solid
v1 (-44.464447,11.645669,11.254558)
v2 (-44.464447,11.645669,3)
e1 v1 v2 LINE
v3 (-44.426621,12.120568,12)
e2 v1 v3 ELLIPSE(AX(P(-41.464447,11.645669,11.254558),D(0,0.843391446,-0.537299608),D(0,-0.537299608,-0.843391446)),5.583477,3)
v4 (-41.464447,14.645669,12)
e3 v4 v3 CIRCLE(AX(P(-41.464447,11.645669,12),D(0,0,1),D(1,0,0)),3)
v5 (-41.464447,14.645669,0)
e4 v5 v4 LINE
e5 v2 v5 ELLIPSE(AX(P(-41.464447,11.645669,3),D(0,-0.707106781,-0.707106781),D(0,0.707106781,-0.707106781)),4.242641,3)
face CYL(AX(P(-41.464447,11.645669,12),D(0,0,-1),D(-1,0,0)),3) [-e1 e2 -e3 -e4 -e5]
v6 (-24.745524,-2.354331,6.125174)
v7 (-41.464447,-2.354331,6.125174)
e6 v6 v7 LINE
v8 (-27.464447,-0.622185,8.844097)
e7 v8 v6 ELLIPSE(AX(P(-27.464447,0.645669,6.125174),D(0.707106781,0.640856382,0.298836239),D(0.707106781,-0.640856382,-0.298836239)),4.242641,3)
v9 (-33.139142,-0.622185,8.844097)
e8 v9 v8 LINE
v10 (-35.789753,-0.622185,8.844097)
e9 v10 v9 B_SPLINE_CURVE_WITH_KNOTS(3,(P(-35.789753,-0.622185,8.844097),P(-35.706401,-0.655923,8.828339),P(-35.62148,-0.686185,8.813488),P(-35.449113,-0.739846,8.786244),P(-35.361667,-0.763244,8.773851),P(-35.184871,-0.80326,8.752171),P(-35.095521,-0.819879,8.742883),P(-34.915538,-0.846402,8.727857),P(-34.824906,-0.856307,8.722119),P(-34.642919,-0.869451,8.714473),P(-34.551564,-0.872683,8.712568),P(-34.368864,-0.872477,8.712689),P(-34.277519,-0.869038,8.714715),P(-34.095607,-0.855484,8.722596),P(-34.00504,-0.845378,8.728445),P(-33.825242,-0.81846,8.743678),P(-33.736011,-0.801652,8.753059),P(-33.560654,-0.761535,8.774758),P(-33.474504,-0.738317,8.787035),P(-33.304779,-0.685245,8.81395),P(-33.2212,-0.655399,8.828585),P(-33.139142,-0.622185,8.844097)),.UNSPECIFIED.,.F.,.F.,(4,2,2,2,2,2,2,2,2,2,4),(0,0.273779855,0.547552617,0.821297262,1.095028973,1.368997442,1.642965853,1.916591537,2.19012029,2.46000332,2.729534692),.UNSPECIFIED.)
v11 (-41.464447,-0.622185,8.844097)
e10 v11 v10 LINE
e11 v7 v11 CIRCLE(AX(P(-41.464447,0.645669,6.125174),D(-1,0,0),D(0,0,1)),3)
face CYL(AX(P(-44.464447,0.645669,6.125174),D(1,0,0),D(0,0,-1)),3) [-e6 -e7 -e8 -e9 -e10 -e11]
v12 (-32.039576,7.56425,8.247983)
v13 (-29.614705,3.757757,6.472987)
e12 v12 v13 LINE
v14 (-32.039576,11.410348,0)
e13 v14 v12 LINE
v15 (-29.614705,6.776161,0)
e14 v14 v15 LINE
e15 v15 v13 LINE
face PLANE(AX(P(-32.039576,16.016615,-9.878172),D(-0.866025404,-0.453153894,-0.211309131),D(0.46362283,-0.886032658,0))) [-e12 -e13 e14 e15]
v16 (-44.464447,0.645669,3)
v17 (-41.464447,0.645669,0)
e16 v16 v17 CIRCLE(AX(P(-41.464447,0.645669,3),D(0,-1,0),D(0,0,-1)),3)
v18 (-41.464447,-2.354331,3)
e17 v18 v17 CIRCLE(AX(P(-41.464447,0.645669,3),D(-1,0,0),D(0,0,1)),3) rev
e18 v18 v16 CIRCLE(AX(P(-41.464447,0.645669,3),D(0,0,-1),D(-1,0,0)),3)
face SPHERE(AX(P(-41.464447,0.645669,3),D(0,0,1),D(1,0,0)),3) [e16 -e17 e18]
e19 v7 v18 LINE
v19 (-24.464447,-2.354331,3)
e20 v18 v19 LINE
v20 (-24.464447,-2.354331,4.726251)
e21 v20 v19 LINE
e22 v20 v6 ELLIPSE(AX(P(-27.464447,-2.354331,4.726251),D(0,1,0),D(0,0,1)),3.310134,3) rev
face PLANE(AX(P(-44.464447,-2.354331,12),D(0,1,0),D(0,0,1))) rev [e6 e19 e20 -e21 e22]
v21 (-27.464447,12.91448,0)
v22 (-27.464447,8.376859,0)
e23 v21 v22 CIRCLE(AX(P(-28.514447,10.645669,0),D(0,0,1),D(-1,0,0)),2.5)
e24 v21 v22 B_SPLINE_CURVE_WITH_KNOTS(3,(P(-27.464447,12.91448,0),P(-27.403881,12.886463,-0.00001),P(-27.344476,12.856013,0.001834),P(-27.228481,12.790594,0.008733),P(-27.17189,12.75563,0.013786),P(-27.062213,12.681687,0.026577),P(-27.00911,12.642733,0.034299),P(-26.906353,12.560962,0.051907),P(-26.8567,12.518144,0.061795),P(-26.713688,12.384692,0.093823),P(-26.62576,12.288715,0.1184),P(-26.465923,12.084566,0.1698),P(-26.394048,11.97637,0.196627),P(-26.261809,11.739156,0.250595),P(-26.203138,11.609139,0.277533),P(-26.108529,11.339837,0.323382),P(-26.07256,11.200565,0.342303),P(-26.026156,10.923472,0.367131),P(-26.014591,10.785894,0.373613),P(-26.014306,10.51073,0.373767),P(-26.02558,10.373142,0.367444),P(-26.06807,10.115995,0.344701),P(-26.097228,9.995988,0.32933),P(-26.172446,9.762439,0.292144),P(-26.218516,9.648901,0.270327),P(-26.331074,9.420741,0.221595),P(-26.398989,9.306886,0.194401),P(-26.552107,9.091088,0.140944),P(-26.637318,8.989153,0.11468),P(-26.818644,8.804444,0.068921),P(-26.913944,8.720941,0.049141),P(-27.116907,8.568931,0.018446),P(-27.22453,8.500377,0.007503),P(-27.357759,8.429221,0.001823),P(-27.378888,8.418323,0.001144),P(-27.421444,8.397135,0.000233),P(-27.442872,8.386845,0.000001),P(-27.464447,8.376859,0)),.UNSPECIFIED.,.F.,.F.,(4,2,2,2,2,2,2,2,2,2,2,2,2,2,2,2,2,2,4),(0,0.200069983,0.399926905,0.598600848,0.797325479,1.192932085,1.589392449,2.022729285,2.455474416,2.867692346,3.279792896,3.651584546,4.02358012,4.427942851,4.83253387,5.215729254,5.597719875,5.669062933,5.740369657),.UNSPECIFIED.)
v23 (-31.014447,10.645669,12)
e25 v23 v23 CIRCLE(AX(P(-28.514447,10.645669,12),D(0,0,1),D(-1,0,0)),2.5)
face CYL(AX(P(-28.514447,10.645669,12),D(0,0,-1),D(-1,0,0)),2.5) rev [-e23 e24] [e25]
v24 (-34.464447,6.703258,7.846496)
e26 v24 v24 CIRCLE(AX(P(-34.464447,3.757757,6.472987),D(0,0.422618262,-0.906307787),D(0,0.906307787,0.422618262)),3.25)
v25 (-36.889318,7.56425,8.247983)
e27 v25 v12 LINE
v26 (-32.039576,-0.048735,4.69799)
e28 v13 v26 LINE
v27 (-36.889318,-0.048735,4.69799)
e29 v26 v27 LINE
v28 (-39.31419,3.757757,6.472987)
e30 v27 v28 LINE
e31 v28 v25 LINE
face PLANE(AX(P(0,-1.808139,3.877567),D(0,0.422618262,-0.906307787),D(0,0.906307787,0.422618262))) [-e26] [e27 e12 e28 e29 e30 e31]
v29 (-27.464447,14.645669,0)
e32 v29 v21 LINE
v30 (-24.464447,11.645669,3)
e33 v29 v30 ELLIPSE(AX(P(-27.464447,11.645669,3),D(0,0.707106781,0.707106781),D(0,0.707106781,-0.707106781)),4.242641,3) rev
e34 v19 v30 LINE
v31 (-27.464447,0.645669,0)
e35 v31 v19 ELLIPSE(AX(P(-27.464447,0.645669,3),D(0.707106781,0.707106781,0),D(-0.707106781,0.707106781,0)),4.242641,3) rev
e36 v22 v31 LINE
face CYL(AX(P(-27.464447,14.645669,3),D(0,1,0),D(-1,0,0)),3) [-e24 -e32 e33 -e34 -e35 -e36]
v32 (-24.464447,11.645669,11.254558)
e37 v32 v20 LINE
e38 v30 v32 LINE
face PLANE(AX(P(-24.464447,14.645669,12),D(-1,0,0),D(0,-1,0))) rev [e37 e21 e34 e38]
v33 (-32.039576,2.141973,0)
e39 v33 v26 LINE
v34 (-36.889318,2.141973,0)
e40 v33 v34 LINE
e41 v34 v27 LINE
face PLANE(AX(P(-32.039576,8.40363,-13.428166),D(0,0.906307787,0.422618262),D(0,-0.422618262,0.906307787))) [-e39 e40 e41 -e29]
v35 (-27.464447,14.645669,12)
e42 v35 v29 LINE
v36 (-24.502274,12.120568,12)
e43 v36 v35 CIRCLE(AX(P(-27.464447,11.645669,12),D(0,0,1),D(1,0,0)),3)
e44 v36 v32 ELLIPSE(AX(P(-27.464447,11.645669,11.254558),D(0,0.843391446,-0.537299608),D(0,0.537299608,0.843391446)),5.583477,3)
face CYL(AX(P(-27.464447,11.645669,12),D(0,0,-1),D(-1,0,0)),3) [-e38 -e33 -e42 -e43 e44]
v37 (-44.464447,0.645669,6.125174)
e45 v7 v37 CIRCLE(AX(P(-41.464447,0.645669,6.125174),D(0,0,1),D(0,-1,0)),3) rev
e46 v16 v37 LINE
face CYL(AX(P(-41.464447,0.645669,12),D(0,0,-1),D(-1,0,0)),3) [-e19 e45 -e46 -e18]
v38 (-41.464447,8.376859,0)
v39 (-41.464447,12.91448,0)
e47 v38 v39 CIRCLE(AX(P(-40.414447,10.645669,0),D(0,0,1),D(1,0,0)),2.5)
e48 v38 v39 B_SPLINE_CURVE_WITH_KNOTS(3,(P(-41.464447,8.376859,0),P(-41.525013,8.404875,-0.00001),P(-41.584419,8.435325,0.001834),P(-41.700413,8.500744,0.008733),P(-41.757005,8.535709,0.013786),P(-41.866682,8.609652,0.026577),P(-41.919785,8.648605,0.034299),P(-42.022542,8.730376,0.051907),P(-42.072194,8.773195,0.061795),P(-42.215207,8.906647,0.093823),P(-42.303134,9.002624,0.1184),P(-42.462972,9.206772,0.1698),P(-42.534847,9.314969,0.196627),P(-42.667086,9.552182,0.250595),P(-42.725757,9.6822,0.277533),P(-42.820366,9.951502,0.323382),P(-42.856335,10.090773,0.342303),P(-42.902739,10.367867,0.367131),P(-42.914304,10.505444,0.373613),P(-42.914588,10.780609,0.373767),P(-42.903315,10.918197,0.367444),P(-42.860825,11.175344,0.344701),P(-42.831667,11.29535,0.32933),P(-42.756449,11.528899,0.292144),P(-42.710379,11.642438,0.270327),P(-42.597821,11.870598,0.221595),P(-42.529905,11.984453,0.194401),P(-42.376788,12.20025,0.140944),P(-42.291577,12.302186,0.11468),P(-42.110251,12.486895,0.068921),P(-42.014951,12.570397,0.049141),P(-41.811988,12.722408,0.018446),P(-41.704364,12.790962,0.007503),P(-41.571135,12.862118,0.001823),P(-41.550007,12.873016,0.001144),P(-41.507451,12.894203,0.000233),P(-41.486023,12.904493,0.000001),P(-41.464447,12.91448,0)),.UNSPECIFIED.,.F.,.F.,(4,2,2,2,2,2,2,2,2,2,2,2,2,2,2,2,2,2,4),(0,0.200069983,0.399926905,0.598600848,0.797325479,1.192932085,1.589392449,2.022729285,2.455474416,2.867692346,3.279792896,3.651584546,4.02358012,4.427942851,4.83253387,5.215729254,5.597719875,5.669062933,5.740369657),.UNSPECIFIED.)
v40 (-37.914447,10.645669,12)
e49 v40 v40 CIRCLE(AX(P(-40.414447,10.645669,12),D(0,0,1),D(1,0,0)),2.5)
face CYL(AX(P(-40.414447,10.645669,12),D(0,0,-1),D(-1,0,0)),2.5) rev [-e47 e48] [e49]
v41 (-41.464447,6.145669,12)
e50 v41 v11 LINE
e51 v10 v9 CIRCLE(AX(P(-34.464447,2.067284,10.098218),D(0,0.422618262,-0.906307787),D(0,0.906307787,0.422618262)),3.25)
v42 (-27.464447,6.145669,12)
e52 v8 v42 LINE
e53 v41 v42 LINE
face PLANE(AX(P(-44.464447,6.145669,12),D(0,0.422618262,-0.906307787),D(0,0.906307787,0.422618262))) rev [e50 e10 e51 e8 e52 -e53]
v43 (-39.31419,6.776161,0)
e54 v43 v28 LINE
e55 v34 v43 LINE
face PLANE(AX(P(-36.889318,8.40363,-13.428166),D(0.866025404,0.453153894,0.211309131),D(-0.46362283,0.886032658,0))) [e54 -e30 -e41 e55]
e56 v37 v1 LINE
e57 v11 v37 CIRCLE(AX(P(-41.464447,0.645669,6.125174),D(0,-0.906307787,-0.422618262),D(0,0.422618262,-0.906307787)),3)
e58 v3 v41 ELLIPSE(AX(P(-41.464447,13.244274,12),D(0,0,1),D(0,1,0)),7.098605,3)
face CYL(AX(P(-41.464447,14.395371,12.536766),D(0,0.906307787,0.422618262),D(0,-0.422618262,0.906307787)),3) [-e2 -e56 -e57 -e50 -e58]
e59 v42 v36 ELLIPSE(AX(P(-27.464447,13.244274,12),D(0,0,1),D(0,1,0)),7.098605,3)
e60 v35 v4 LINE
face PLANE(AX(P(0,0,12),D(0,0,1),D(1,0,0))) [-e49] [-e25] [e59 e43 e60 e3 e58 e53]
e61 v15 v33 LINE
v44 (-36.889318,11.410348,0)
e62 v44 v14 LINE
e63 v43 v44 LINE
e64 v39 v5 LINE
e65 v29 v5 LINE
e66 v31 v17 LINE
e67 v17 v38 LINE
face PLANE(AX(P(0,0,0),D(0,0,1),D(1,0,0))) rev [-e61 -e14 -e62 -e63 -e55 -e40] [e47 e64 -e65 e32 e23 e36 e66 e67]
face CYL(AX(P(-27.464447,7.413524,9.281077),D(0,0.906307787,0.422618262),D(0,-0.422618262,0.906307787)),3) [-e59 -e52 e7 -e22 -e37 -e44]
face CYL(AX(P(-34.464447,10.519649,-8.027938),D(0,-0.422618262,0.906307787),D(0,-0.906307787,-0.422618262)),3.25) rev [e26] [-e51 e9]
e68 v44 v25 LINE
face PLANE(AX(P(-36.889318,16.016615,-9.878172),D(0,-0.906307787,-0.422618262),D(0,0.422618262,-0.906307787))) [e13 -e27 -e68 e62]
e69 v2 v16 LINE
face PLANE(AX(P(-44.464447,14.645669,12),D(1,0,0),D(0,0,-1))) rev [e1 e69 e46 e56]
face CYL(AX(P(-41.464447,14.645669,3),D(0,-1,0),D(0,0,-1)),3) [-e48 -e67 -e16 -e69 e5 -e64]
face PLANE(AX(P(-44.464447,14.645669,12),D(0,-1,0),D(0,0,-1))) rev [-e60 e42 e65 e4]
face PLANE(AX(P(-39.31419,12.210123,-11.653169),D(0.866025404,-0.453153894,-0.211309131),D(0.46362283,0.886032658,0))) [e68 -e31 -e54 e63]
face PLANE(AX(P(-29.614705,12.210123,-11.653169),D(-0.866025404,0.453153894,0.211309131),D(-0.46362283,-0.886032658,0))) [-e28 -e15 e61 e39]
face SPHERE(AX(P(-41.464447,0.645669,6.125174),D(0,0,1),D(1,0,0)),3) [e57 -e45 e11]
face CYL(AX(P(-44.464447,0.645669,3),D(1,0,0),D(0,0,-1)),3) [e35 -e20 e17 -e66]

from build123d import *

# Parameters (mm, degrees)
CROQUIS1_W              = 20
CROQUIS1_H              = 17
CROQUIS1_R              = 2.5
SALIENTE_EXTRUIR2_DEPTH = 12
CORTAR_EXTRUIR2_DEPTH   = 20
CROQUIS5_R              = 3.25
CORTAR_EXTRUIR3_DEPTH   = 20
CORTAR_EXTRUIR4_START   = 4
CORTAR_EXTRUIR4_DEPTH   = 20
REDONDEO1_R             = 3


with BuildPart() as part:
    # Croquis1 → Saliente-Extruir2 (new body)
    with BuildSketch(Plane.XY):
        with Locations((-34.464447367, 6.145669291)):
            Rectangle(CROQUIS1_W, CROQUIS1_H)
        with Locations((-40.414447367, 10.645669291)):
            Circle(CROQUIS1_R, mode=Mode.SUBTRACT)
        with Locations(Location((-28.514447367, 10.645669291, 0), (0, 0, 180))):
            Circle(CROQUIS1_R, mode=Mode.SUBTRACT)
    extrude(amount=SALIENTE_EXTRUIR2_DEPTH)

    # Croquis4 → Cortar-Extruir2 (cut)
    with BuildSketch(Plane(origin=(-24.464447367, 0, 0), x_dir=(0, 0, -1), z_dir=(1, 0, 0))):
        Polygon((-12, 6.145669291), (-8.036384906, -2.354330709), (-12, -2.354330709), align=None)
    extrude(amount=-CORTAR_EXTRUIR2_DEPTH, mode=Mode.SUBTRACT)

    # Croquis5 → Cortar-Extruir3 (cut)
    with BuildSketch(Plane(origin=(0, 11.801993797, 14.637587434), x_dir=(1, 0, 0), z_dir=(0, 0.42261826174069395, -0.9063077870366525))):
        with Locations(Location((-34.464447367, 10.741063562, 0), (0, 0, 90))):
            Circle(CROQUIS5_R)
    extrude(amount=CORTAR_EXTRUIR3_DEPTH, mode=Mode.SUBTRACT)

    # Croquis6 → Cortar-Extruir4 (cut)
    with BuildSketch(Plane(origin=(0, 11.801993797, 14.637587434), x_dir=(1, 0, 0), z_dir=(0, 0.42261826174069395, -0.9063077870366525)).offset(CORTAR_EXTRUIR4_START)):
        Polygon((-29.614705106, 10.741063562), (-32.039576236, 14.941063562), (-36.889318498, 14.941063562), (-39.314189628, 10.741063562), (-36.889318498, 6.541063562), (-32.039576236, 6.541063562), align=None)
    extrude(amount=CORTAR_EXTRUIR4_DEPTH, mode=Mode.SUBTRACT)

    # Redondeo1
    # the kernel refuses this fillet: 3 mm, written as the material it takes off along each edge
    with BuildSketch(Plane(origin=(-41.464447367, 0.645669291, 3), x_dir=(0, 0, -1), z_dir=(-1, 0, 0))) as redondeo1_piece_1_section:
        Polygon((0, 0), (REDONDEO1_R, 0), (REDONDEO1_R, REDONDEO1_R), (0, REDONDEO1_R), align=None)
    redondeo1_piece_1 = extrude(amount=REDONDEO1_R, mode=Mode.PRIVATE)
    redondeo1_piece_1 = redondeo1_piece_1 - Plane(origin=(-41.464447367, 0.645669291, 3), x_dir=(0, 0.7071067811865475, 0.7071067811865475), z_dir=(-1, 0, 0)) * Sphere(REDONDEO1_R, mode=Mode.PRIVATE)
    add(redondeo1_piece_1, mode=Mode.SUBTRACT)
    with BuildSketch(Plane(origin=(-41.464447367, 0.645669291, 6.125174123), x_dir=(0, -0.422618261740694, 0.9063077870366527), z_dir=(-1, 0, 0))) as redondeo1_piece_2_section:
        Polygon((0, 0), (REDONDEO1_R, 0), (REDONDEO1_R, -REDONDEO1_R * 0.637070260807), (REDONDEO1_R * 0.422618261741, -REDONDEO1_R * 0.906307787037), align=None)
    redondeo1_piece_2 = extrude(amount=REDONDEO1_R, mode=Mode.PRIVATE)
    redondeo1_piece_2 = redondeo1_piece_2 - Plane(origin=(-41.464447367, 0.645669291, 6.125174123), x_dir=(0, 0.8433914458128839, -0.5372996083468264), z_dir=(-1, 0, 0)) * Sphere(REDONDEO1_R, mode=Mode.PRIVATE)
    add(redondeo1_piece_2, mode=Mode.SUBTRACT)
    with BuildSketch(Plane(origin=(-44.464447367, 0.645669291, 0), x_dir=(0, 0, 1), z_dir=(0, 1, 0))) as redondeo1_piece_3:
        with BuildLine():
            CenterArc((REDONDEO1_R, REDONDEO1_R), REDONDEO1_R, 180, 90)
            Line((0, REDONDEO1_R), (0, 0))
            Line((0, 0), (REDONDEO1_R, 0))
        make_face()
    extrude(amount=21.5, mode=Mode.SUBTRACT)
    with BuildSketch(Plane(origin=(-44.464447367, 14.645669291, -7.5), x_dir=(1, 0, 0), z_dir=(0, 0, 1))) as redondeo1_piece_4:
        with BuildLine():
            CenterArc((REDONDEO1_R, -REDONDEO1_R), REDONDEO1_R, 90, 90)
            Line((0, -REDONDEO1_R), (0, 0))
            Line((0, 0), (REDONDEO1_R, 0))
        make_face()
    extrude(amount=27, mode=Mode.SUBTRACT)
    with BuildSketch(Plane(origin=(-24.464447367, 14.645669291, -7.5), x_dir=(-1, 0, 0), z_dir=(0, 0, 1))) as redondeo1_piece_5:
        with BuildLine():
            CenterArc((REDONDEO1_R, REDONDEO1_R), REDONDEO1_R, 180, 90)
            Line((0, REDONDEO1_R), (0, 0))
            Line((0, 0), (REDONDEO1_R, 0))
        make_face()
    extrude(amount=27, mode=Mode.SUBTRACT)
    with BuildSketch(Plane(origin=(-24.464447367, 22.145669291, 0), x_dir=(0, 0, 1), z_dir=(0, -1, 0))) as redondeo1_piece_6:
        with BuildLine():
            CenterArc((REDONDEO1_R, REDONDEO1_R), REDONDEO1_R, 180, 90)
            Line((0, REDONDEO1_R), (0, 0))
            Line((0, 0), (REDONDEO1_R, 0))
        make_face()
    extrude(amount=32, mode=Mode.SUBTRACT)
    with BuildSketch(Plane(origin=(-16.964447367, -2.354330709, 0), x_dir=(0, 1, 0), z_dir=(-1, 0, 0))) as redondeo1_piece_7:
        with BuildLine():
            CenterArc((REDONDEO1_R, -REDONDEO1_R), REDONDEO1_R, 90, 90)
            Line((0, -REDONDEO1_R), (0, 0))
            Line((0, 0), (REDONDEO1_R, 0))
        make_face()
    extrude(amount=24.5, mode=Mode.SUBTRACT)
    with BuildSketch(Plane(origin=(-44.464447367, -2.354330709, 3), x_dir=(0, 1, 0), z_dir=(0, 0, 1))) as redondeo1_piece_8:
        with BuildLine():
            CenterArc((REDONDEO1_R, -REDONDEO1_R), REDONDEO1_R, 90, 90)
            Line((0, -REDONDEO1_R), (0, 0))
            Line((0, 0), (REDONDEO1_R, 0))
        make_face()
    extrude(amount=3.125174123, mode=Mode.SUBTRACT)
    with BuildSketch(Plane(origin=(-44.464447367, 12.942977694, 15.169636963), x_dir=(0, 0.42261826174069395, -0.9063077870366526), z_dir=(0, -0.9063077870366526, -0.42261826174069395))) as redondeo1_piece_9:
        with BuildLine():
            CenterArc((REDONDEO1_R, REDONDEO1_R), REDONDEO1_R, 180, 90)
            Line((0, REDONDEO1_R), (0, 0))
            Line((0, 0), (REDONDEO1_R, 0))
        make_face()
    extrude(amount=14.967501529, mode=Mode.SUBTRACT)
    with BuildSketch(Plane(origin=(-24.464447367, 12.942977694, 15.169636963), x_dir=(0, 0.4226182617406939, -0.9063077870366525), z_dir=(0, -0.9063077870366526, -0.42261826174069395))) as redondeo1_piece_10:
        with BuildLine():
            CenterArc((REDONDEO1_R, -REDONDEO1_R), REDONDEO1_R, 90, 90)
            Line((0, -REDONDEO1_R), (0, 0))
            Line((0, 0), (REDONDEO1_R, 0))
        make_face()
    extrude(amount=24.378712311, mode=Mode.SUBTRACT)
    with BuildSketch(Plane(origin=(-19.686420411, -2.354330709, 8.036384906), x_dir=(0, 0.9063077870366527, 0.4226182617406936), z_dir=(-1, 0, 0))) as redondeo1_piece_11:
        with BuildLine():
            CenterArc((REDONDEO1_R * 0.637070260807, REDONDEO1_R), REDONDEO1_R, 205, 65)
            Line((-REDONDEO1_R * 0.269237526229, REDONDEO1_R * 0.577381738259), (0, 0))
            Line((0, 0), (REDONDEO1_R * 0.637070260807, 0))
        make_face()
    extrude(amount=21.778026956, mode=Mode.SUBTRACT)


solid = part.part
